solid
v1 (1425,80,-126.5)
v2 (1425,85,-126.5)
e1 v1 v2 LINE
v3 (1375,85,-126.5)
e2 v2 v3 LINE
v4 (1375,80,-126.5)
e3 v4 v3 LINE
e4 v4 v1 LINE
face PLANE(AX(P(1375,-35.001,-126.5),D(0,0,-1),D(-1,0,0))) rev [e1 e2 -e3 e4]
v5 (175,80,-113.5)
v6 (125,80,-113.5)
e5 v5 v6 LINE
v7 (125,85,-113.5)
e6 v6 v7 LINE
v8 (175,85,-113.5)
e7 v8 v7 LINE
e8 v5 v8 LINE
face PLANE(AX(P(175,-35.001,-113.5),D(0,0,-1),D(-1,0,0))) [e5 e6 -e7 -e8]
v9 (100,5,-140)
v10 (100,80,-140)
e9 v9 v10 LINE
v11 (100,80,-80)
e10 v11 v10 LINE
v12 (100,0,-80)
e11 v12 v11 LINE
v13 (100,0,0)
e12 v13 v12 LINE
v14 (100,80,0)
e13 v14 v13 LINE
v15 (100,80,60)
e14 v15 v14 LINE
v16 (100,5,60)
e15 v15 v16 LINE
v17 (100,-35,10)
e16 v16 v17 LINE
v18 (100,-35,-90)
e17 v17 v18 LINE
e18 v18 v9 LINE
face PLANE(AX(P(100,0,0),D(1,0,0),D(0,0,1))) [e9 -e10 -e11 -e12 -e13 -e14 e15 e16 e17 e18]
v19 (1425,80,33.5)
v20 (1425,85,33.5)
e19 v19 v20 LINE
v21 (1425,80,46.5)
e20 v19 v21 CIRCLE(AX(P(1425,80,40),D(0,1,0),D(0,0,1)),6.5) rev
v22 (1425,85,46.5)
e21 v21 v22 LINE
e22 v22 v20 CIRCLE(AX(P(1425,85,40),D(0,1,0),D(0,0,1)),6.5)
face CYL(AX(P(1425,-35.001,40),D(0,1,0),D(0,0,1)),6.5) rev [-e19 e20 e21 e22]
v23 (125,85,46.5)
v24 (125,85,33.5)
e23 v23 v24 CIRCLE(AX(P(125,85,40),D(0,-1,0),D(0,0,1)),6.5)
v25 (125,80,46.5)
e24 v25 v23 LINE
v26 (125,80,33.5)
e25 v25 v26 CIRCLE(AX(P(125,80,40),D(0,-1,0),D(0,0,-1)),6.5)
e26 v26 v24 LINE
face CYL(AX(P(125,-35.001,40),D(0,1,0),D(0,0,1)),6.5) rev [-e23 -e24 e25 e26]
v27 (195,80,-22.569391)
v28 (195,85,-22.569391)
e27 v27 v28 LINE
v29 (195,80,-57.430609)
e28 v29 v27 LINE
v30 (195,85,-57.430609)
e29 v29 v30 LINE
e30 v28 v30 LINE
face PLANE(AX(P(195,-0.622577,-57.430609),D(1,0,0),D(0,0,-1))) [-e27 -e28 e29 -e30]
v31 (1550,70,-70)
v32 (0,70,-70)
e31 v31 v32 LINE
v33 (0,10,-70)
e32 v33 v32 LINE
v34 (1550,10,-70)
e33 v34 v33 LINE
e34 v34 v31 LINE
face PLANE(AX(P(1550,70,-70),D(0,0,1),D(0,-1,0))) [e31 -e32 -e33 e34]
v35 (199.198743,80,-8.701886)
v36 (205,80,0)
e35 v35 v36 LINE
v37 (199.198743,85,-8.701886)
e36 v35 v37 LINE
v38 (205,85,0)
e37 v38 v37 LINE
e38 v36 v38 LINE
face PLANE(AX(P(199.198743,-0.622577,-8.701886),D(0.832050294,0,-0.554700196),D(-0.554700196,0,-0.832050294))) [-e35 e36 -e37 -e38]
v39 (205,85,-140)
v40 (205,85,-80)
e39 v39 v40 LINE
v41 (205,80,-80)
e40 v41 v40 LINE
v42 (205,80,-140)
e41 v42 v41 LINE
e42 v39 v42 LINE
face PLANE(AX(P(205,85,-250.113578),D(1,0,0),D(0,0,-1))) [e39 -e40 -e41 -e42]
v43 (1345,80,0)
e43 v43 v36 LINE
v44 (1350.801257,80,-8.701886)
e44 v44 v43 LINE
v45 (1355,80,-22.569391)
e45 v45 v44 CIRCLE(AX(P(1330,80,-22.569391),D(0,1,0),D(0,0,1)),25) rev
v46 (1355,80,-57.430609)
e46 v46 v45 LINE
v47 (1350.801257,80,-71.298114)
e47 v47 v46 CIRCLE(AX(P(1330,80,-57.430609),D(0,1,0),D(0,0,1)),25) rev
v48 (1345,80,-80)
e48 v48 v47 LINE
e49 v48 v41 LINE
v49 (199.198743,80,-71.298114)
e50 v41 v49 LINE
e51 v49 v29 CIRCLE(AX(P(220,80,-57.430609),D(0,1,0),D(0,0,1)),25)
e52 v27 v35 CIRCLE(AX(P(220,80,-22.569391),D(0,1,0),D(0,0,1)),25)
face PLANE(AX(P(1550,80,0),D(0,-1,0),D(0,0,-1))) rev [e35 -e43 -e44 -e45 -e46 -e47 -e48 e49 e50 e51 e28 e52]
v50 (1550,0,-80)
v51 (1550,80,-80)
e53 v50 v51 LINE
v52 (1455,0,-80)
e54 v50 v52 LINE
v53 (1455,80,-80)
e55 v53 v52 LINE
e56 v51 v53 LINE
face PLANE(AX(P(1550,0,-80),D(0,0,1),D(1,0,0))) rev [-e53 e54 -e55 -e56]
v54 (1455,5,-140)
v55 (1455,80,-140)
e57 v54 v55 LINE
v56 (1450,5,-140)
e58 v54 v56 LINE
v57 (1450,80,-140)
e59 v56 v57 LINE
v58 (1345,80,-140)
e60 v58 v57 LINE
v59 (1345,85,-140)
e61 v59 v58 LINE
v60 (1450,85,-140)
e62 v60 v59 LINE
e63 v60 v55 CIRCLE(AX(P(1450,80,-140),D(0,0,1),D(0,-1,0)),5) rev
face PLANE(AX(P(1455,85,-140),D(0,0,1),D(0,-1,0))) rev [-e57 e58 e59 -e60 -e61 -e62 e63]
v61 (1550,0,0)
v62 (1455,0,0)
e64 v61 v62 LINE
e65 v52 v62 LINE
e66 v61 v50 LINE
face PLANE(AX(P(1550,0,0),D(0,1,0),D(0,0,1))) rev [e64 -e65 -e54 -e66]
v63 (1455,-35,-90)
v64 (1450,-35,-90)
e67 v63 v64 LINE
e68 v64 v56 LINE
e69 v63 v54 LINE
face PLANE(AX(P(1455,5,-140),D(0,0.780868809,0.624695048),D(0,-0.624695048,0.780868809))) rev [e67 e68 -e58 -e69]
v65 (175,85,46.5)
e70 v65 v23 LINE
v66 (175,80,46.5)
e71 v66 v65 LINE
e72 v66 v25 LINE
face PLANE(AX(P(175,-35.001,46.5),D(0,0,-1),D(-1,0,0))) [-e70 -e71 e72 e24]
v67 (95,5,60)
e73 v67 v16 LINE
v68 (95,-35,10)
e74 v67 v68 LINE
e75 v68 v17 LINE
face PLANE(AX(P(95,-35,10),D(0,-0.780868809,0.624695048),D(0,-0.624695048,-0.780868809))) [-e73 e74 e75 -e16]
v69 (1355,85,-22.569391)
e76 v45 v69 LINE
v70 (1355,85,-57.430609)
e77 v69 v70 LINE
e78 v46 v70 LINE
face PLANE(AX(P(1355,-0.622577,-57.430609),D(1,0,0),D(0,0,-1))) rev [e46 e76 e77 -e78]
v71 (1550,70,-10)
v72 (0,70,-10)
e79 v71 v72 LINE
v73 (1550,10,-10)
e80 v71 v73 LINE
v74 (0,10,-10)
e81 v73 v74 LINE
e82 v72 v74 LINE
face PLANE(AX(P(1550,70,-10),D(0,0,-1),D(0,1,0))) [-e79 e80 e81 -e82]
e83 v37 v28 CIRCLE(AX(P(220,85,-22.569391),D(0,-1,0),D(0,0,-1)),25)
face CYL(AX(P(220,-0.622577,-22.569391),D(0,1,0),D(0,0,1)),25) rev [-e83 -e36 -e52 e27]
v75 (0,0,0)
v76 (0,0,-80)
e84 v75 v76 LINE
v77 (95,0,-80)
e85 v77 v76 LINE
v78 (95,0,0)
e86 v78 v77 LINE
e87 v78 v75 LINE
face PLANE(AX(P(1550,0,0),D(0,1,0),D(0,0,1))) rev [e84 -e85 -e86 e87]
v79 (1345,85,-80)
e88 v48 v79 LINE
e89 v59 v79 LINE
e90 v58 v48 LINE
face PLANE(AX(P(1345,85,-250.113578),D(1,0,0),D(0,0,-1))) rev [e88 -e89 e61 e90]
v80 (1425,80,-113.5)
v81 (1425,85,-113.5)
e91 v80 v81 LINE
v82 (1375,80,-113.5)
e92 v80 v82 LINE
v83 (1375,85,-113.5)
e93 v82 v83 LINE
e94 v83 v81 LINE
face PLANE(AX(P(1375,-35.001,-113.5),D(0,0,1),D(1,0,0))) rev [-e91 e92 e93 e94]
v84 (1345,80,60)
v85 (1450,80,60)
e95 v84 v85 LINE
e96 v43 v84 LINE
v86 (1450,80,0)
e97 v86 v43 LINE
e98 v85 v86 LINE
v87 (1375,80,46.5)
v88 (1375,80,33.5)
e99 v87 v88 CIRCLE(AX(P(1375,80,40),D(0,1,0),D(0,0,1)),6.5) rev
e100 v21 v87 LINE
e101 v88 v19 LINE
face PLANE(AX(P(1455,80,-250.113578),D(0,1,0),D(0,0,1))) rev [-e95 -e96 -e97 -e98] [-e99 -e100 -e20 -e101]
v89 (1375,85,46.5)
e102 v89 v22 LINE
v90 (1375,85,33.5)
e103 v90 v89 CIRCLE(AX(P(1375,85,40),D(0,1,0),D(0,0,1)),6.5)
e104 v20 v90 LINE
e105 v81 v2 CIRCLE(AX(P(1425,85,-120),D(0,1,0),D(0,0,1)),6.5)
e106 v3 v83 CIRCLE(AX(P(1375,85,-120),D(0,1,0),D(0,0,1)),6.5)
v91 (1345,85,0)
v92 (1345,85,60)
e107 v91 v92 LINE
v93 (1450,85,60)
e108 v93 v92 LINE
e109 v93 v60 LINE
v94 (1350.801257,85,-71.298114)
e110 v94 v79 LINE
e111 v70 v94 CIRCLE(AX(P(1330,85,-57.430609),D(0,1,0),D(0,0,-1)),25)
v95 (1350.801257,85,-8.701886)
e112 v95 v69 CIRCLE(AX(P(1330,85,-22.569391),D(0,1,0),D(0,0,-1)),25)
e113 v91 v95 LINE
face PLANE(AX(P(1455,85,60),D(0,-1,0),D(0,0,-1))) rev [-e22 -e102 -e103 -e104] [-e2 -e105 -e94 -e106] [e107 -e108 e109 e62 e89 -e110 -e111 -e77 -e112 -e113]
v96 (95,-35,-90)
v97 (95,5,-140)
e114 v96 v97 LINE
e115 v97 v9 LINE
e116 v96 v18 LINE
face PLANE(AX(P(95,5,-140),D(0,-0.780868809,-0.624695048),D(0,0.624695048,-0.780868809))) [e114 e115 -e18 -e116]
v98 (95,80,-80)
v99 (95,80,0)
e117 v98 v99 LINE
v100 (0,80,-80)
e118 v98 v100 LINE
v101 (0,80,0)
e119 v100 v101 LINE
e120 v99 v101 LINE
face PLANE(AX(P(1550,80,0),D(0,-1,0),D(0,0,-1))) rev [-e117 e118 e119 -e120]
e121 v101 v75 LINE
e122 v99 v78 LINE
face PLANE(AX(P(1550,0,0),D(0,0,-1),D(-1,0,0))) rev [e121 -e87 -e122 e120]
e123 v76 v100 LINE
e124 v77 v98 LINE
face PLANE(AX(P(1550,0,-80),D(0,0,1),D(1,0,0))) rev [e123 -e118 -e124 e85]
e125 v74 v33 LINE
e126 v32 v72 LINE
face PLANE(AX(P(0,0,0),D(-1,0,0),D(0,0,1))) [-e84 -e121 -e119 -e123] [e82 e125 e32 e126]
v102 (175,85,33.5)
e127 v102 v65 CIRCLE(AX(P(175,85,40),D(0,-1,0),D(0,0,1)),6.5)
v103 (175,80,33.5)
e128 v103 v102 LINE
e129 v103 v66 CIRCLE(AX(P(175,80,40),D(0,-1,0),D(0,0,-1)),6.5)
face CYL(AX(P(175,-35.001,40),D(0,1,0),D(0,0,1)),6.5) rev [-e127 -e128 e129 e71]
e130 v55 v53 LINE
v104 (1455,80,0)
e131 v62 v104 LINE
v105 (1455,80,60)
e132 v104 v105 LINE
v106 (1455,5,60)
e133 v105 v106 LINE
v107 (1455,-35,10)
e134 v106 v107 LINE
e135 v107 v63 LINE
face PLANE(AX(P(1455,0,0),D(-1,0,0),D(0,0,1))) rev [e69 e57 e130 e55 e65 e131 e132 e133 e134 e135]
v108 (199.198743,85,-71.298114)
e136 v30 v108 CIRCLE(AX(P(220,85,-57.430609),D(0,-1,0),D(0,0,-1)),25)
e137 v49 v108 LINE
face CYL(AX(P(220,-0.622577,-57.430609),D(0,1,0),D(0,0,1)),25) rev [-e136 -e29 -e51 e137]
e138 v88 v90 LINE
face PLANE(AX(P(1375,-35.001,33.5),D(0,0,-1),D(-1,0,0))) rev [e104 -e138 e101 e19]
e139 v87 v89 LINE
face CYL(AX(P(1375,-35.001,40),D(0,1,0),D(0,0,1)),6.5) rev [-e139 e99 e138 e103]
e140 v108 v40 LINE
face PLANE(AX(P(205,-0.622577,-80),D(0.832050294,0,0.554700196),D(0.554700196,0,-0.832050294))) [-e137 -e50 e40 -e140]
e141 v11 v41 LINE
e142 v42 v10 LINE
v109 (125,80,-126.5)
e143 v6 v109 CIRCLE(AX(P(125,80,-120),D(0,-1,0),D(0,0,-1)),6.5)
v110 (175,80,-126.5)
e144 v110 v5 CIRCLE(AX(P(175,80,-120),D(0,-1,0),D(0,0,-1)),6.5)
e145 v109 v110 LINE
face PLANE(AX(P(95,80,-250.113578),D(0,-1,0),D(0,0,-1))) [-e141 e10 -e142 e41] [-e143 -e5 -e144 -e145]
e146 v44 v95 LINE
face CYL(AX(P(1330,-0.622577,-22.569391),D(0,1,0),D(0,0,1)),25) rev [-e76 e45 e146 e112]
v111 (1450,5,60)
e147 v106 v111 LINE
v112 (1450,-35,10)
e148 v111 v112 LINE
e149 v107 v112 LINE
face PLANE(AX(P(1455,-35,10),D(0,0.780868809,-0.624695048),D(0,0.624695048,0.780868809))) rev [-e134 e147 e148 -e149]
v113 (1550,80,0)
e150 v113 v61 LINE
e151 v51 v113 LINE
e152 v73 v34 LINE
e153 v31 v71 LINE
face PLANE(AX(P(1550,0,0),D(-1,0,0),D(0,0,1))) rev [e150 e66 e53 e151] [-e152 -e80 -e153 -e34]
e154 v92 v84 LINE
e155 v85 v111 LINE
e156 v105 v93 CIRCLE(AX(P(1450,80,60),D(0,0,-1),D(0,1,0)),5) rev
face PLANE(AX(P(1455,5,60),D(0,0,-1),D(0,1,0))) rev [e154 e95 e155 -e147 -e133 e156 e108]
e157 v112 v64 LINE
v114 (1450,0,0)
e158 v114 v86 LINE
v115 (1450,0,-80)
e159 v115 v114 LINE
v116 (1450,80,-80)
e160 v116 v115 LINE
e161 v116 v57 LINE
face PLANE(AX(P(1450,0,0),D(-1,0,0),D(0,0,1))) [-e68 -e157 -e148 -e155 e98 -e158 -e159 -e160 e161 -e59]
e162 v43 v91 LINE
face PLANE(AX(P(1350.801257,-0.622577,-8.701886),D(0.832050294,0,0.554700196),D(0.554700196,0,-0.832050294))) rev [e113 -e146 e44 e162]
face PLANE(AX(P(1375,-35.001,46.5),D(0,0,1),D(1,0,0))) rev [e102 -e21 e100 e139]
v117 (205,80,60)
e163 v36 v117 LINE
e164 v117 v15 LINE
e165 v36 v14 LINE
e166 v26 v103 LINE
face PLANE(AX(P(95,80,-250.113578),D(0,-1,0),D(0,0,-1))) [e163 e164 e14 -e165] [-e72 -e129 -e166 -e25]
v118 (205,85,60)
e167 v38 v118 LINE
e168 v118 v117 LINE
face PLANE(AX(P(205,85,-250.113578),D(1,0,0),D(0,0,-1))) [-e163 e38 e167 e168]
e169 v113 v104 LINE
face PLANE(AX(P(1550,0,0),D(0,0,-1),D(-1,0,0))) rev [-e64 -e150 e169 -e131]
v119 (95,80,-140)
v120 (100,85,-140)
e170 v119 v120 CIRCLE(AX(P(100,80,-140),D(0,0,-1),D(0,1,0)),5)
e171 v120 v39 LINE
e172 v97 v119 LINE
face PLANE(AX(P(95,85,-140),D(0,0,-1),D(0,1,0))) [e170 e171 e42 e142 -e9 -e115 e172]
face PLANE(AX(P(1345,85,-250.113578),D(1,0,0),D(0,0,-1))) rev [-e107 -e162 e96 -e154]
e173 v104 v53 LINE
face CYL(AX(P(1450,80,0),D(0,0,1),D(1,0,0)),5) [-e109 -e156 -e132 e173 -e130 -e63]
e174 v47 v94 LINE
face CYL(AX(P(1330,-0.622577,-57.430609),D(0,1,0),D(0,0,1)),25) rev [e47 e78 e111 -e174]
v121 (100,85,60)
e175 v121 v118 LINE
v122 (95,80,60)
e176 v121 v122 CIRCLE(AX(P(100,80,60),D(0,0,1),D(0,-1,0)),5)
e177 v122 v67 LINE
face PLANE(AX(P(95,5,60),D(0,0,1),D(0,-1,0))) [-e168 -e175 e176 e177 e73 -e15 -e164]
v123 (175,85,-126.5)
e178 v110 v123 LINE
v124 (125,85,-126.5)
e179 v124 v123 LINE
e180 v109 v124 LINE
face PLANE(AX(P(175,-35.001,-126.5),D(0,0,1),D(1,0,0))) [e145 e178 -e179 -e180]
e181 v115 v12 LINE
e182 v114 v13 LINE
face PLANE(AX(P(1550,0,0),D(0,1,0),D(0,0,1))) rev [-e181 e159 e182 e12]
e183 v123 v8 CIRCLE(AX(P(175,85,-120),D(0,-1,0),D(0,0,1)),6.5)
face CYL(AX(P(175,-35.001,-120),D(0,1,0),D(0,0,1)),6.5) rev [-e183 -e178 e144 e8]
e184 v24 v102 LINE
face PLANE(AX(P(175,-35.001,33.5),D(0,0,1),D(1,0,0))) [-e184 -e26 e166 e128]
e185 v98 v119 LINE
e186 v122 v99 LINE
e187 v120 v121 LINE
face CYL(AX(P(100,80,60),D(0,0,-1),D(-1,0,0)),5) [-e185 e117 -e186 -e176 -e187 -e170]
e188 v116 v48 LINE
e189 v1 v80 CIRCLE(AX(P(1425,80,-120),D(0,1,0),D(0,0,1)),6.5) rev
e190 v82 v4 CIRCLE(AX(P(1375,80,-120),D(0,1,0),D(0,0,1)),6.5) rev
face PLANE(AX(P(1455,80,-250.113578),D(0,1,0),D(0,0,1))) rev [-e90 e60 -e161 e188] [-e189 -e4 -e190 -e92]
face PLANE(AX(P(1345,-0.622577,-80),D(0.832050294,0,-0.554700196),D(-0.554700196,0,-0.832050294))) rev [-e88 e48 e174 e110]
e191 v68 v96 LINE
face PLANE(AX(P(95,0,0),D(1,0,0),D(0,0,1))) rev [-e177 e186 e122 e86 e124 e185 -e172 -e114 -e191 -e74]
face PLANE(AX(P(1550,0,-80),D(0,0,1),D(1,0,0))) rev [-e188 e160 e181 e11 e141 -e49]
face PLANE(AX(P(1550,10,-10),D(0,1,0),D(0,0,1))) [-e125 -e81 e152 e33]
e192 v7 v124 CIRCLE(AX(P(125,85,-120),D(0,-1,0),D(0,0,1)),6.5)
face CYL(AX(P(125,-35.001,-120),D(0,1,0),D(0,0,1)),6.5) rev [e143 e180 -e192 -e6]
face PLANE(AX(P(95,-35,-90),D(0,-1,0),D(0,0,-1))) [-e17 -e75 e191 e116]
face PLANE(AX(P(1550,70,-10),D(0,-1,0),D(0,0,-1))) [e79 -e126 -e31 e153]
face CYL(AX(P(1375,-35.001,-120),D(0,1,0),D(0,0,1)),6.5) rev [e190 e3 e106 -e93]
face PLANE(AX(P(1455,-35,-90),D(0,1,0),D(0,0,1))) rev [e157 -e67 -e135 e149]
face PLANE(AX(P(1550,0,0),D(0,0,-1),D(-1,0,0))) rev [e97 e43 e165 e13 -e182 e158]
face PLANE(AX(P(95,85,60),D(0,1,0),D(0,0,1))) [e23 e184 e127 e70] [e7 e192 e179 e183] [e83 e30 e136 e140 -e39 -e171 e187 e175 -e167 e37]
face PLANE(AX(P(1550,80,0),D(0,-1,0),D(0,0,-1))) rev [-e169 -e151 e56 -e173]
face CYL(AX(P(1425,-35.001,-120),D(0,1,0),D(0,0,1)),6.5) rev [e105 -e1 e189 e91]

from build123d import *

# Parameters (mm, degrees)
SKETCH3_W                       = 80
SKETCH3_H                       = 80
SKETCH3_W_2                     = 60
SKETCH3_H_2                     = 60
BOSS_EXTRUDE2_DEPTH             = 1550
SKETCH7_W                       = 60
SKETCH7_H                       = 60
BOSS_EXTRUDE3_DEPTH             = 5
BOSS_EXTRUDE4_REACH             = 1560.629
SKETCH8_W                       = 110
SKETCH8_H                       = 5
BOSS_EXTRUDE4_DIRECTION_2_REACH = 1560.629
CUT_EXTRUDE1_DEPTH              = 5
CUT_EXTRUDE2_REACH              = 1562.929
FILLET1_R                       = 5
FILLET1_OF_MIRROR1_R            = 5
FILLET1_OF_MIRROR2_R            = 5


with BuildPart() as part:
    # Sketch3 → Boss-Extrude2 (new body)
    with BuildSketch(Plane(origin=(0, 0, 0), x_dir=(0, 0, -1), z_dir=(1, 0, 0))):
        with Locations((40, 40)):
            Rectangle(SKETCH3_W, SKETCH3_H)
        with Locations((40, 40)):
            Rectangle(SKETCH3_W_2, SKETCH3_H_2, mode=Mode.SUBTRACT)
    extrude(amount=BOSS_EXTRUDE2_DEPTH)

    # Sketch7 → Boss-Extrude3 (add)
    with BuildSketch(Plane(origin=(1450, 0, 0), x_dir=(0, 0, -1), z_dir=(1, 0, 0))):
        Polygon((-60, 85), (140, 85), (140, 5), (90, -35), (-10, -35), (-60, 5), align=None)
        with Locations((40, 40)):
            Rectangle(SKETCH7_W, SKETCH7_H, mode=Mode.SUBTRACT)
    boss_extrude3 = extrude(amount=BOSS_EXTRUDE3_DEPTH)

    # Boss-Extrude4: up to this face of the body (flat: up to its plane)
    boss_extrude4_end = Plane(part.part.faces().sort_by_distance((1452.5, 45, -140))[0])
    # Sketch8 → Boss-Extrude4 (add, up to the picked face)
    with BuildSketch(Plane(origin=(0, 0, -80), x_dir=(-1, 0, 0), z_dir=(0, 0, -1)), mode=Mode.PRIVATE) as boss_extrude4_sk1:
        with Locations((-1400, 82.5)):
            Rectangle(SKETCH8_W, SKETCH8_H)
    boss_extrude4_tool1 = split(extrude(boss_extrude4_sk1.sketch, amount=BOSS_EXTRUDE4_REACH, mode=Mode.PRIVATE), bisect_by=boss_extrude4_end, keep=Keep.BOTH, mode=Mode.PRIVATE)
    boss_extrude4 = boss_extrude4_tool1.solids().sort_by(Axis((1400, 82.5, -80), (0, 0, -1)))[0]
    add(boss_extrude4)

    # Boss-Extrude4 direction 2: up to this face of the body (flat: up to its plane)
    boss_extrude4_direction_2_end = Plane(part.part.faces().sort_by_distance((1452.5, 45, 60))[0])
    # Sketch8 → Boss-Extrude4 direction 2 (add, up to the picked face)
    with BuildSketch(Plane(origin=(0, 0, -80), x_dir=(-1, 0, 0), z_dir=(0, 0, -1)), mode=Mode.PRIVATE) as boss_extrude4_direction_2_sk1:
        with Locations((-1400, 82.5)):
            Rectangle(SKETCH8_W, SKETCH8_H)
    boss_extrude4_direction_2_tool1 = split(extrude(boss_extrude4_direction_2_sk1.sketch, amount=-BOSS_EXTRUDE4_DIRECTION_2_REACH, mode=Mode.PRIVATE), bisect_by=boss_extrude4_direction_2_end, keep=Keep.BOTH, mode=Mode.PRIVATE)
    boss_extrude4_direction_2 = boss_extrude4_direction_2_tool1.solids().sort_by(Axis((1400, 82.5, -80), (0, 0, 1)))[0]
    add(boss_extrude4_direction_2)

    # Sketch9 → Cut-Extrude1 (cut)
    with BuildSketch(Plane(origin=(0, 85, 0), x_dir=(1, 0, 0), z_dir=(0, 1, 0))):
        with BuildLine():
            Line((1345, 80), (1350.801257358, 71.298113962))
            ThreePointArc((1350.801257358, 71.298113962), (1353.927300662, 64.675212774), (1355, 57.430609057))
            Line((1355, 57.430609057), (1355, 22.569390943))
            ThreePointArc((1355, 22.569390943), (1353.927300662, 15.324787226), (1350.801257358, 8.701886038))
            Line((1350.801257358, 8.701886038), (1345, 0))
            Line((1345, 0), (1345, 80))
        make_face()
    cut_extrude1 = extrude(amount=-CUT_EXTRUDE1_DEPTH, mode=Mode.SUBTRACT)

    # Sketch10 → Cut-Extrude2 (cut, up to next)
    with BuildSketch(Plane(origin=(0, 85, 0), x_dir=(1, 0, 0), z_dir=(0, 1, 0)), mode=Mode.PRIVATE) as cut_extrude2_sk1:
        with BuildLine():
            Line((1375, 126.5), (1425, 126.5))
            ThreePointArc((1425, 126.5), (1431.5, 120), (1425, 113.5))
            Line((1425, 113.5), (1375, 113.5))
            ThreePointArc((1375, 113.5), (1368.5, 120), (1375, 126.5))
        make_face()
    cut_extrude2_tool1 = extrude(cut_extrude2_sk1.sketch, amount=-CUT_EXTRUDE2_REACH, mode=Mode.PRIVATE) & part.part
    # Sketch10 → Cut-Extrude2 (cut, up to next)
    with BuildSketch(Plane(origin=(0, 85, 0), x_dir=(1, 0, 0), z_dir=(0, 1, 0)), mode=Mode.PRIVATE) as cut_extrude2_sk2:
        with BuildLine():
            Line((1375, -33.5), (1425, -33.5))
            ThreePointArc((1425, -33.5), (1431.5, -40), (1425, -46.5))
            Line((1425, -46.5), (1375, -46.5))
            ThreePointArc((1375, -46.5), (1368.5, -40), (1375, -33.5))
        make_face()
    cut_extrude2_tool2 = extrude(cut_extrude2_sk2.sketch, amount=-CUT_EXTRUDE2_REACH, mode=Mode.PRIVATE) & part.part
    cut_extrude2_1 = cut_extrude2_tool1.solids().sort_by_distance((1400, 85, -120))[0]
    add(cut_extrude2_1, mode=Mode.SUBTRACT)
    cut_extrude2_2 = cut_extrude2_tool2.solids().sort_by_distance((1400, 85, 40))[0]
    add(cut_extrude2_2, mode=Mode.SUBTRACT)
    cut_extrude2 = cut_extrude2_1 + cut_extrude2_2  # Cut-Extrude2 as one shape, for the pattern or mirror that repeats it

    # Fillet1
    fillet1_edges = [part.edges().sort_by_distance(p)[0] for p in [
        (1455, 85, -40),
    ]]
    fillet(fillet1_edges, radius=FILLET1_R - 0.0001)  # a hair under: the kernel refuses the full size

    # Mirror1: Boss-Extrude3 across plane
    add(boss_extrude3.mirror(Plane(origin=(775, 0, 0), x_dir=(0, 0, 1), z_dir=(1, 0, 0))))

    # Fillet1 of Mirror1
    fillet1_of_mirror1_edges = [part.edges().sort_by_distance(p)[0] for p in [
        (95, 85, -40),
    ]]
    fillet(fillet1_of_mirror1_edges, radius=FILLET1_OF_MIRROR1_R - 0.0001)  # a hair under: the kernel refuses the full size

    # Mirror2: Boss-Extrude3, Boss-Extrude4, Boss-Extrude4 direction 2, Cut-Extrude1, Cut-Extrude2 across plane
    add(boss_extrude3.mirror(Plane(origin=(775, 0, 0), x_dir=(0, 0, 1), z_dir=(1, 0, 0))))
    add(boss_extrude4.mirror(Plane(origin=(775, 0, 0), x_dir=(0, 0, 1), z_dir=(1, 0, 0))))
    add(boss_extrude4_direction_2.mirror(Plane(origin=(775, 0, 0), x_dir=(0, 0, 1), z_dir=(1, 0, 0))))
    add(cut_extrude1.mirror(Plane(origin=(775, 0, 0), x_dir=(0, 0, 1), z_dir=(1, 0, 0))), mode=Mode.SUBTRACT)
    add(cut_extrude2.mirror(Plane(origin=(775, 0, 0), x_dir=(0, 0, 1), z_dir=(1, 0, 0))), mode=Mode.SUBTRACT)

    # Fillet1 of Mirror2
    fillet1_of_mirror2_edges = [part.edges().sort_by_distance(p)[0] for p in [
        (95, 85, -40),
    ]]
    fillet(fillet1_of_mirror2_edges, radius=FILLET1_OF_MIRROR2_R - 0.0001)  # a hair under: the kernel refuses the full size


solid = part.part
